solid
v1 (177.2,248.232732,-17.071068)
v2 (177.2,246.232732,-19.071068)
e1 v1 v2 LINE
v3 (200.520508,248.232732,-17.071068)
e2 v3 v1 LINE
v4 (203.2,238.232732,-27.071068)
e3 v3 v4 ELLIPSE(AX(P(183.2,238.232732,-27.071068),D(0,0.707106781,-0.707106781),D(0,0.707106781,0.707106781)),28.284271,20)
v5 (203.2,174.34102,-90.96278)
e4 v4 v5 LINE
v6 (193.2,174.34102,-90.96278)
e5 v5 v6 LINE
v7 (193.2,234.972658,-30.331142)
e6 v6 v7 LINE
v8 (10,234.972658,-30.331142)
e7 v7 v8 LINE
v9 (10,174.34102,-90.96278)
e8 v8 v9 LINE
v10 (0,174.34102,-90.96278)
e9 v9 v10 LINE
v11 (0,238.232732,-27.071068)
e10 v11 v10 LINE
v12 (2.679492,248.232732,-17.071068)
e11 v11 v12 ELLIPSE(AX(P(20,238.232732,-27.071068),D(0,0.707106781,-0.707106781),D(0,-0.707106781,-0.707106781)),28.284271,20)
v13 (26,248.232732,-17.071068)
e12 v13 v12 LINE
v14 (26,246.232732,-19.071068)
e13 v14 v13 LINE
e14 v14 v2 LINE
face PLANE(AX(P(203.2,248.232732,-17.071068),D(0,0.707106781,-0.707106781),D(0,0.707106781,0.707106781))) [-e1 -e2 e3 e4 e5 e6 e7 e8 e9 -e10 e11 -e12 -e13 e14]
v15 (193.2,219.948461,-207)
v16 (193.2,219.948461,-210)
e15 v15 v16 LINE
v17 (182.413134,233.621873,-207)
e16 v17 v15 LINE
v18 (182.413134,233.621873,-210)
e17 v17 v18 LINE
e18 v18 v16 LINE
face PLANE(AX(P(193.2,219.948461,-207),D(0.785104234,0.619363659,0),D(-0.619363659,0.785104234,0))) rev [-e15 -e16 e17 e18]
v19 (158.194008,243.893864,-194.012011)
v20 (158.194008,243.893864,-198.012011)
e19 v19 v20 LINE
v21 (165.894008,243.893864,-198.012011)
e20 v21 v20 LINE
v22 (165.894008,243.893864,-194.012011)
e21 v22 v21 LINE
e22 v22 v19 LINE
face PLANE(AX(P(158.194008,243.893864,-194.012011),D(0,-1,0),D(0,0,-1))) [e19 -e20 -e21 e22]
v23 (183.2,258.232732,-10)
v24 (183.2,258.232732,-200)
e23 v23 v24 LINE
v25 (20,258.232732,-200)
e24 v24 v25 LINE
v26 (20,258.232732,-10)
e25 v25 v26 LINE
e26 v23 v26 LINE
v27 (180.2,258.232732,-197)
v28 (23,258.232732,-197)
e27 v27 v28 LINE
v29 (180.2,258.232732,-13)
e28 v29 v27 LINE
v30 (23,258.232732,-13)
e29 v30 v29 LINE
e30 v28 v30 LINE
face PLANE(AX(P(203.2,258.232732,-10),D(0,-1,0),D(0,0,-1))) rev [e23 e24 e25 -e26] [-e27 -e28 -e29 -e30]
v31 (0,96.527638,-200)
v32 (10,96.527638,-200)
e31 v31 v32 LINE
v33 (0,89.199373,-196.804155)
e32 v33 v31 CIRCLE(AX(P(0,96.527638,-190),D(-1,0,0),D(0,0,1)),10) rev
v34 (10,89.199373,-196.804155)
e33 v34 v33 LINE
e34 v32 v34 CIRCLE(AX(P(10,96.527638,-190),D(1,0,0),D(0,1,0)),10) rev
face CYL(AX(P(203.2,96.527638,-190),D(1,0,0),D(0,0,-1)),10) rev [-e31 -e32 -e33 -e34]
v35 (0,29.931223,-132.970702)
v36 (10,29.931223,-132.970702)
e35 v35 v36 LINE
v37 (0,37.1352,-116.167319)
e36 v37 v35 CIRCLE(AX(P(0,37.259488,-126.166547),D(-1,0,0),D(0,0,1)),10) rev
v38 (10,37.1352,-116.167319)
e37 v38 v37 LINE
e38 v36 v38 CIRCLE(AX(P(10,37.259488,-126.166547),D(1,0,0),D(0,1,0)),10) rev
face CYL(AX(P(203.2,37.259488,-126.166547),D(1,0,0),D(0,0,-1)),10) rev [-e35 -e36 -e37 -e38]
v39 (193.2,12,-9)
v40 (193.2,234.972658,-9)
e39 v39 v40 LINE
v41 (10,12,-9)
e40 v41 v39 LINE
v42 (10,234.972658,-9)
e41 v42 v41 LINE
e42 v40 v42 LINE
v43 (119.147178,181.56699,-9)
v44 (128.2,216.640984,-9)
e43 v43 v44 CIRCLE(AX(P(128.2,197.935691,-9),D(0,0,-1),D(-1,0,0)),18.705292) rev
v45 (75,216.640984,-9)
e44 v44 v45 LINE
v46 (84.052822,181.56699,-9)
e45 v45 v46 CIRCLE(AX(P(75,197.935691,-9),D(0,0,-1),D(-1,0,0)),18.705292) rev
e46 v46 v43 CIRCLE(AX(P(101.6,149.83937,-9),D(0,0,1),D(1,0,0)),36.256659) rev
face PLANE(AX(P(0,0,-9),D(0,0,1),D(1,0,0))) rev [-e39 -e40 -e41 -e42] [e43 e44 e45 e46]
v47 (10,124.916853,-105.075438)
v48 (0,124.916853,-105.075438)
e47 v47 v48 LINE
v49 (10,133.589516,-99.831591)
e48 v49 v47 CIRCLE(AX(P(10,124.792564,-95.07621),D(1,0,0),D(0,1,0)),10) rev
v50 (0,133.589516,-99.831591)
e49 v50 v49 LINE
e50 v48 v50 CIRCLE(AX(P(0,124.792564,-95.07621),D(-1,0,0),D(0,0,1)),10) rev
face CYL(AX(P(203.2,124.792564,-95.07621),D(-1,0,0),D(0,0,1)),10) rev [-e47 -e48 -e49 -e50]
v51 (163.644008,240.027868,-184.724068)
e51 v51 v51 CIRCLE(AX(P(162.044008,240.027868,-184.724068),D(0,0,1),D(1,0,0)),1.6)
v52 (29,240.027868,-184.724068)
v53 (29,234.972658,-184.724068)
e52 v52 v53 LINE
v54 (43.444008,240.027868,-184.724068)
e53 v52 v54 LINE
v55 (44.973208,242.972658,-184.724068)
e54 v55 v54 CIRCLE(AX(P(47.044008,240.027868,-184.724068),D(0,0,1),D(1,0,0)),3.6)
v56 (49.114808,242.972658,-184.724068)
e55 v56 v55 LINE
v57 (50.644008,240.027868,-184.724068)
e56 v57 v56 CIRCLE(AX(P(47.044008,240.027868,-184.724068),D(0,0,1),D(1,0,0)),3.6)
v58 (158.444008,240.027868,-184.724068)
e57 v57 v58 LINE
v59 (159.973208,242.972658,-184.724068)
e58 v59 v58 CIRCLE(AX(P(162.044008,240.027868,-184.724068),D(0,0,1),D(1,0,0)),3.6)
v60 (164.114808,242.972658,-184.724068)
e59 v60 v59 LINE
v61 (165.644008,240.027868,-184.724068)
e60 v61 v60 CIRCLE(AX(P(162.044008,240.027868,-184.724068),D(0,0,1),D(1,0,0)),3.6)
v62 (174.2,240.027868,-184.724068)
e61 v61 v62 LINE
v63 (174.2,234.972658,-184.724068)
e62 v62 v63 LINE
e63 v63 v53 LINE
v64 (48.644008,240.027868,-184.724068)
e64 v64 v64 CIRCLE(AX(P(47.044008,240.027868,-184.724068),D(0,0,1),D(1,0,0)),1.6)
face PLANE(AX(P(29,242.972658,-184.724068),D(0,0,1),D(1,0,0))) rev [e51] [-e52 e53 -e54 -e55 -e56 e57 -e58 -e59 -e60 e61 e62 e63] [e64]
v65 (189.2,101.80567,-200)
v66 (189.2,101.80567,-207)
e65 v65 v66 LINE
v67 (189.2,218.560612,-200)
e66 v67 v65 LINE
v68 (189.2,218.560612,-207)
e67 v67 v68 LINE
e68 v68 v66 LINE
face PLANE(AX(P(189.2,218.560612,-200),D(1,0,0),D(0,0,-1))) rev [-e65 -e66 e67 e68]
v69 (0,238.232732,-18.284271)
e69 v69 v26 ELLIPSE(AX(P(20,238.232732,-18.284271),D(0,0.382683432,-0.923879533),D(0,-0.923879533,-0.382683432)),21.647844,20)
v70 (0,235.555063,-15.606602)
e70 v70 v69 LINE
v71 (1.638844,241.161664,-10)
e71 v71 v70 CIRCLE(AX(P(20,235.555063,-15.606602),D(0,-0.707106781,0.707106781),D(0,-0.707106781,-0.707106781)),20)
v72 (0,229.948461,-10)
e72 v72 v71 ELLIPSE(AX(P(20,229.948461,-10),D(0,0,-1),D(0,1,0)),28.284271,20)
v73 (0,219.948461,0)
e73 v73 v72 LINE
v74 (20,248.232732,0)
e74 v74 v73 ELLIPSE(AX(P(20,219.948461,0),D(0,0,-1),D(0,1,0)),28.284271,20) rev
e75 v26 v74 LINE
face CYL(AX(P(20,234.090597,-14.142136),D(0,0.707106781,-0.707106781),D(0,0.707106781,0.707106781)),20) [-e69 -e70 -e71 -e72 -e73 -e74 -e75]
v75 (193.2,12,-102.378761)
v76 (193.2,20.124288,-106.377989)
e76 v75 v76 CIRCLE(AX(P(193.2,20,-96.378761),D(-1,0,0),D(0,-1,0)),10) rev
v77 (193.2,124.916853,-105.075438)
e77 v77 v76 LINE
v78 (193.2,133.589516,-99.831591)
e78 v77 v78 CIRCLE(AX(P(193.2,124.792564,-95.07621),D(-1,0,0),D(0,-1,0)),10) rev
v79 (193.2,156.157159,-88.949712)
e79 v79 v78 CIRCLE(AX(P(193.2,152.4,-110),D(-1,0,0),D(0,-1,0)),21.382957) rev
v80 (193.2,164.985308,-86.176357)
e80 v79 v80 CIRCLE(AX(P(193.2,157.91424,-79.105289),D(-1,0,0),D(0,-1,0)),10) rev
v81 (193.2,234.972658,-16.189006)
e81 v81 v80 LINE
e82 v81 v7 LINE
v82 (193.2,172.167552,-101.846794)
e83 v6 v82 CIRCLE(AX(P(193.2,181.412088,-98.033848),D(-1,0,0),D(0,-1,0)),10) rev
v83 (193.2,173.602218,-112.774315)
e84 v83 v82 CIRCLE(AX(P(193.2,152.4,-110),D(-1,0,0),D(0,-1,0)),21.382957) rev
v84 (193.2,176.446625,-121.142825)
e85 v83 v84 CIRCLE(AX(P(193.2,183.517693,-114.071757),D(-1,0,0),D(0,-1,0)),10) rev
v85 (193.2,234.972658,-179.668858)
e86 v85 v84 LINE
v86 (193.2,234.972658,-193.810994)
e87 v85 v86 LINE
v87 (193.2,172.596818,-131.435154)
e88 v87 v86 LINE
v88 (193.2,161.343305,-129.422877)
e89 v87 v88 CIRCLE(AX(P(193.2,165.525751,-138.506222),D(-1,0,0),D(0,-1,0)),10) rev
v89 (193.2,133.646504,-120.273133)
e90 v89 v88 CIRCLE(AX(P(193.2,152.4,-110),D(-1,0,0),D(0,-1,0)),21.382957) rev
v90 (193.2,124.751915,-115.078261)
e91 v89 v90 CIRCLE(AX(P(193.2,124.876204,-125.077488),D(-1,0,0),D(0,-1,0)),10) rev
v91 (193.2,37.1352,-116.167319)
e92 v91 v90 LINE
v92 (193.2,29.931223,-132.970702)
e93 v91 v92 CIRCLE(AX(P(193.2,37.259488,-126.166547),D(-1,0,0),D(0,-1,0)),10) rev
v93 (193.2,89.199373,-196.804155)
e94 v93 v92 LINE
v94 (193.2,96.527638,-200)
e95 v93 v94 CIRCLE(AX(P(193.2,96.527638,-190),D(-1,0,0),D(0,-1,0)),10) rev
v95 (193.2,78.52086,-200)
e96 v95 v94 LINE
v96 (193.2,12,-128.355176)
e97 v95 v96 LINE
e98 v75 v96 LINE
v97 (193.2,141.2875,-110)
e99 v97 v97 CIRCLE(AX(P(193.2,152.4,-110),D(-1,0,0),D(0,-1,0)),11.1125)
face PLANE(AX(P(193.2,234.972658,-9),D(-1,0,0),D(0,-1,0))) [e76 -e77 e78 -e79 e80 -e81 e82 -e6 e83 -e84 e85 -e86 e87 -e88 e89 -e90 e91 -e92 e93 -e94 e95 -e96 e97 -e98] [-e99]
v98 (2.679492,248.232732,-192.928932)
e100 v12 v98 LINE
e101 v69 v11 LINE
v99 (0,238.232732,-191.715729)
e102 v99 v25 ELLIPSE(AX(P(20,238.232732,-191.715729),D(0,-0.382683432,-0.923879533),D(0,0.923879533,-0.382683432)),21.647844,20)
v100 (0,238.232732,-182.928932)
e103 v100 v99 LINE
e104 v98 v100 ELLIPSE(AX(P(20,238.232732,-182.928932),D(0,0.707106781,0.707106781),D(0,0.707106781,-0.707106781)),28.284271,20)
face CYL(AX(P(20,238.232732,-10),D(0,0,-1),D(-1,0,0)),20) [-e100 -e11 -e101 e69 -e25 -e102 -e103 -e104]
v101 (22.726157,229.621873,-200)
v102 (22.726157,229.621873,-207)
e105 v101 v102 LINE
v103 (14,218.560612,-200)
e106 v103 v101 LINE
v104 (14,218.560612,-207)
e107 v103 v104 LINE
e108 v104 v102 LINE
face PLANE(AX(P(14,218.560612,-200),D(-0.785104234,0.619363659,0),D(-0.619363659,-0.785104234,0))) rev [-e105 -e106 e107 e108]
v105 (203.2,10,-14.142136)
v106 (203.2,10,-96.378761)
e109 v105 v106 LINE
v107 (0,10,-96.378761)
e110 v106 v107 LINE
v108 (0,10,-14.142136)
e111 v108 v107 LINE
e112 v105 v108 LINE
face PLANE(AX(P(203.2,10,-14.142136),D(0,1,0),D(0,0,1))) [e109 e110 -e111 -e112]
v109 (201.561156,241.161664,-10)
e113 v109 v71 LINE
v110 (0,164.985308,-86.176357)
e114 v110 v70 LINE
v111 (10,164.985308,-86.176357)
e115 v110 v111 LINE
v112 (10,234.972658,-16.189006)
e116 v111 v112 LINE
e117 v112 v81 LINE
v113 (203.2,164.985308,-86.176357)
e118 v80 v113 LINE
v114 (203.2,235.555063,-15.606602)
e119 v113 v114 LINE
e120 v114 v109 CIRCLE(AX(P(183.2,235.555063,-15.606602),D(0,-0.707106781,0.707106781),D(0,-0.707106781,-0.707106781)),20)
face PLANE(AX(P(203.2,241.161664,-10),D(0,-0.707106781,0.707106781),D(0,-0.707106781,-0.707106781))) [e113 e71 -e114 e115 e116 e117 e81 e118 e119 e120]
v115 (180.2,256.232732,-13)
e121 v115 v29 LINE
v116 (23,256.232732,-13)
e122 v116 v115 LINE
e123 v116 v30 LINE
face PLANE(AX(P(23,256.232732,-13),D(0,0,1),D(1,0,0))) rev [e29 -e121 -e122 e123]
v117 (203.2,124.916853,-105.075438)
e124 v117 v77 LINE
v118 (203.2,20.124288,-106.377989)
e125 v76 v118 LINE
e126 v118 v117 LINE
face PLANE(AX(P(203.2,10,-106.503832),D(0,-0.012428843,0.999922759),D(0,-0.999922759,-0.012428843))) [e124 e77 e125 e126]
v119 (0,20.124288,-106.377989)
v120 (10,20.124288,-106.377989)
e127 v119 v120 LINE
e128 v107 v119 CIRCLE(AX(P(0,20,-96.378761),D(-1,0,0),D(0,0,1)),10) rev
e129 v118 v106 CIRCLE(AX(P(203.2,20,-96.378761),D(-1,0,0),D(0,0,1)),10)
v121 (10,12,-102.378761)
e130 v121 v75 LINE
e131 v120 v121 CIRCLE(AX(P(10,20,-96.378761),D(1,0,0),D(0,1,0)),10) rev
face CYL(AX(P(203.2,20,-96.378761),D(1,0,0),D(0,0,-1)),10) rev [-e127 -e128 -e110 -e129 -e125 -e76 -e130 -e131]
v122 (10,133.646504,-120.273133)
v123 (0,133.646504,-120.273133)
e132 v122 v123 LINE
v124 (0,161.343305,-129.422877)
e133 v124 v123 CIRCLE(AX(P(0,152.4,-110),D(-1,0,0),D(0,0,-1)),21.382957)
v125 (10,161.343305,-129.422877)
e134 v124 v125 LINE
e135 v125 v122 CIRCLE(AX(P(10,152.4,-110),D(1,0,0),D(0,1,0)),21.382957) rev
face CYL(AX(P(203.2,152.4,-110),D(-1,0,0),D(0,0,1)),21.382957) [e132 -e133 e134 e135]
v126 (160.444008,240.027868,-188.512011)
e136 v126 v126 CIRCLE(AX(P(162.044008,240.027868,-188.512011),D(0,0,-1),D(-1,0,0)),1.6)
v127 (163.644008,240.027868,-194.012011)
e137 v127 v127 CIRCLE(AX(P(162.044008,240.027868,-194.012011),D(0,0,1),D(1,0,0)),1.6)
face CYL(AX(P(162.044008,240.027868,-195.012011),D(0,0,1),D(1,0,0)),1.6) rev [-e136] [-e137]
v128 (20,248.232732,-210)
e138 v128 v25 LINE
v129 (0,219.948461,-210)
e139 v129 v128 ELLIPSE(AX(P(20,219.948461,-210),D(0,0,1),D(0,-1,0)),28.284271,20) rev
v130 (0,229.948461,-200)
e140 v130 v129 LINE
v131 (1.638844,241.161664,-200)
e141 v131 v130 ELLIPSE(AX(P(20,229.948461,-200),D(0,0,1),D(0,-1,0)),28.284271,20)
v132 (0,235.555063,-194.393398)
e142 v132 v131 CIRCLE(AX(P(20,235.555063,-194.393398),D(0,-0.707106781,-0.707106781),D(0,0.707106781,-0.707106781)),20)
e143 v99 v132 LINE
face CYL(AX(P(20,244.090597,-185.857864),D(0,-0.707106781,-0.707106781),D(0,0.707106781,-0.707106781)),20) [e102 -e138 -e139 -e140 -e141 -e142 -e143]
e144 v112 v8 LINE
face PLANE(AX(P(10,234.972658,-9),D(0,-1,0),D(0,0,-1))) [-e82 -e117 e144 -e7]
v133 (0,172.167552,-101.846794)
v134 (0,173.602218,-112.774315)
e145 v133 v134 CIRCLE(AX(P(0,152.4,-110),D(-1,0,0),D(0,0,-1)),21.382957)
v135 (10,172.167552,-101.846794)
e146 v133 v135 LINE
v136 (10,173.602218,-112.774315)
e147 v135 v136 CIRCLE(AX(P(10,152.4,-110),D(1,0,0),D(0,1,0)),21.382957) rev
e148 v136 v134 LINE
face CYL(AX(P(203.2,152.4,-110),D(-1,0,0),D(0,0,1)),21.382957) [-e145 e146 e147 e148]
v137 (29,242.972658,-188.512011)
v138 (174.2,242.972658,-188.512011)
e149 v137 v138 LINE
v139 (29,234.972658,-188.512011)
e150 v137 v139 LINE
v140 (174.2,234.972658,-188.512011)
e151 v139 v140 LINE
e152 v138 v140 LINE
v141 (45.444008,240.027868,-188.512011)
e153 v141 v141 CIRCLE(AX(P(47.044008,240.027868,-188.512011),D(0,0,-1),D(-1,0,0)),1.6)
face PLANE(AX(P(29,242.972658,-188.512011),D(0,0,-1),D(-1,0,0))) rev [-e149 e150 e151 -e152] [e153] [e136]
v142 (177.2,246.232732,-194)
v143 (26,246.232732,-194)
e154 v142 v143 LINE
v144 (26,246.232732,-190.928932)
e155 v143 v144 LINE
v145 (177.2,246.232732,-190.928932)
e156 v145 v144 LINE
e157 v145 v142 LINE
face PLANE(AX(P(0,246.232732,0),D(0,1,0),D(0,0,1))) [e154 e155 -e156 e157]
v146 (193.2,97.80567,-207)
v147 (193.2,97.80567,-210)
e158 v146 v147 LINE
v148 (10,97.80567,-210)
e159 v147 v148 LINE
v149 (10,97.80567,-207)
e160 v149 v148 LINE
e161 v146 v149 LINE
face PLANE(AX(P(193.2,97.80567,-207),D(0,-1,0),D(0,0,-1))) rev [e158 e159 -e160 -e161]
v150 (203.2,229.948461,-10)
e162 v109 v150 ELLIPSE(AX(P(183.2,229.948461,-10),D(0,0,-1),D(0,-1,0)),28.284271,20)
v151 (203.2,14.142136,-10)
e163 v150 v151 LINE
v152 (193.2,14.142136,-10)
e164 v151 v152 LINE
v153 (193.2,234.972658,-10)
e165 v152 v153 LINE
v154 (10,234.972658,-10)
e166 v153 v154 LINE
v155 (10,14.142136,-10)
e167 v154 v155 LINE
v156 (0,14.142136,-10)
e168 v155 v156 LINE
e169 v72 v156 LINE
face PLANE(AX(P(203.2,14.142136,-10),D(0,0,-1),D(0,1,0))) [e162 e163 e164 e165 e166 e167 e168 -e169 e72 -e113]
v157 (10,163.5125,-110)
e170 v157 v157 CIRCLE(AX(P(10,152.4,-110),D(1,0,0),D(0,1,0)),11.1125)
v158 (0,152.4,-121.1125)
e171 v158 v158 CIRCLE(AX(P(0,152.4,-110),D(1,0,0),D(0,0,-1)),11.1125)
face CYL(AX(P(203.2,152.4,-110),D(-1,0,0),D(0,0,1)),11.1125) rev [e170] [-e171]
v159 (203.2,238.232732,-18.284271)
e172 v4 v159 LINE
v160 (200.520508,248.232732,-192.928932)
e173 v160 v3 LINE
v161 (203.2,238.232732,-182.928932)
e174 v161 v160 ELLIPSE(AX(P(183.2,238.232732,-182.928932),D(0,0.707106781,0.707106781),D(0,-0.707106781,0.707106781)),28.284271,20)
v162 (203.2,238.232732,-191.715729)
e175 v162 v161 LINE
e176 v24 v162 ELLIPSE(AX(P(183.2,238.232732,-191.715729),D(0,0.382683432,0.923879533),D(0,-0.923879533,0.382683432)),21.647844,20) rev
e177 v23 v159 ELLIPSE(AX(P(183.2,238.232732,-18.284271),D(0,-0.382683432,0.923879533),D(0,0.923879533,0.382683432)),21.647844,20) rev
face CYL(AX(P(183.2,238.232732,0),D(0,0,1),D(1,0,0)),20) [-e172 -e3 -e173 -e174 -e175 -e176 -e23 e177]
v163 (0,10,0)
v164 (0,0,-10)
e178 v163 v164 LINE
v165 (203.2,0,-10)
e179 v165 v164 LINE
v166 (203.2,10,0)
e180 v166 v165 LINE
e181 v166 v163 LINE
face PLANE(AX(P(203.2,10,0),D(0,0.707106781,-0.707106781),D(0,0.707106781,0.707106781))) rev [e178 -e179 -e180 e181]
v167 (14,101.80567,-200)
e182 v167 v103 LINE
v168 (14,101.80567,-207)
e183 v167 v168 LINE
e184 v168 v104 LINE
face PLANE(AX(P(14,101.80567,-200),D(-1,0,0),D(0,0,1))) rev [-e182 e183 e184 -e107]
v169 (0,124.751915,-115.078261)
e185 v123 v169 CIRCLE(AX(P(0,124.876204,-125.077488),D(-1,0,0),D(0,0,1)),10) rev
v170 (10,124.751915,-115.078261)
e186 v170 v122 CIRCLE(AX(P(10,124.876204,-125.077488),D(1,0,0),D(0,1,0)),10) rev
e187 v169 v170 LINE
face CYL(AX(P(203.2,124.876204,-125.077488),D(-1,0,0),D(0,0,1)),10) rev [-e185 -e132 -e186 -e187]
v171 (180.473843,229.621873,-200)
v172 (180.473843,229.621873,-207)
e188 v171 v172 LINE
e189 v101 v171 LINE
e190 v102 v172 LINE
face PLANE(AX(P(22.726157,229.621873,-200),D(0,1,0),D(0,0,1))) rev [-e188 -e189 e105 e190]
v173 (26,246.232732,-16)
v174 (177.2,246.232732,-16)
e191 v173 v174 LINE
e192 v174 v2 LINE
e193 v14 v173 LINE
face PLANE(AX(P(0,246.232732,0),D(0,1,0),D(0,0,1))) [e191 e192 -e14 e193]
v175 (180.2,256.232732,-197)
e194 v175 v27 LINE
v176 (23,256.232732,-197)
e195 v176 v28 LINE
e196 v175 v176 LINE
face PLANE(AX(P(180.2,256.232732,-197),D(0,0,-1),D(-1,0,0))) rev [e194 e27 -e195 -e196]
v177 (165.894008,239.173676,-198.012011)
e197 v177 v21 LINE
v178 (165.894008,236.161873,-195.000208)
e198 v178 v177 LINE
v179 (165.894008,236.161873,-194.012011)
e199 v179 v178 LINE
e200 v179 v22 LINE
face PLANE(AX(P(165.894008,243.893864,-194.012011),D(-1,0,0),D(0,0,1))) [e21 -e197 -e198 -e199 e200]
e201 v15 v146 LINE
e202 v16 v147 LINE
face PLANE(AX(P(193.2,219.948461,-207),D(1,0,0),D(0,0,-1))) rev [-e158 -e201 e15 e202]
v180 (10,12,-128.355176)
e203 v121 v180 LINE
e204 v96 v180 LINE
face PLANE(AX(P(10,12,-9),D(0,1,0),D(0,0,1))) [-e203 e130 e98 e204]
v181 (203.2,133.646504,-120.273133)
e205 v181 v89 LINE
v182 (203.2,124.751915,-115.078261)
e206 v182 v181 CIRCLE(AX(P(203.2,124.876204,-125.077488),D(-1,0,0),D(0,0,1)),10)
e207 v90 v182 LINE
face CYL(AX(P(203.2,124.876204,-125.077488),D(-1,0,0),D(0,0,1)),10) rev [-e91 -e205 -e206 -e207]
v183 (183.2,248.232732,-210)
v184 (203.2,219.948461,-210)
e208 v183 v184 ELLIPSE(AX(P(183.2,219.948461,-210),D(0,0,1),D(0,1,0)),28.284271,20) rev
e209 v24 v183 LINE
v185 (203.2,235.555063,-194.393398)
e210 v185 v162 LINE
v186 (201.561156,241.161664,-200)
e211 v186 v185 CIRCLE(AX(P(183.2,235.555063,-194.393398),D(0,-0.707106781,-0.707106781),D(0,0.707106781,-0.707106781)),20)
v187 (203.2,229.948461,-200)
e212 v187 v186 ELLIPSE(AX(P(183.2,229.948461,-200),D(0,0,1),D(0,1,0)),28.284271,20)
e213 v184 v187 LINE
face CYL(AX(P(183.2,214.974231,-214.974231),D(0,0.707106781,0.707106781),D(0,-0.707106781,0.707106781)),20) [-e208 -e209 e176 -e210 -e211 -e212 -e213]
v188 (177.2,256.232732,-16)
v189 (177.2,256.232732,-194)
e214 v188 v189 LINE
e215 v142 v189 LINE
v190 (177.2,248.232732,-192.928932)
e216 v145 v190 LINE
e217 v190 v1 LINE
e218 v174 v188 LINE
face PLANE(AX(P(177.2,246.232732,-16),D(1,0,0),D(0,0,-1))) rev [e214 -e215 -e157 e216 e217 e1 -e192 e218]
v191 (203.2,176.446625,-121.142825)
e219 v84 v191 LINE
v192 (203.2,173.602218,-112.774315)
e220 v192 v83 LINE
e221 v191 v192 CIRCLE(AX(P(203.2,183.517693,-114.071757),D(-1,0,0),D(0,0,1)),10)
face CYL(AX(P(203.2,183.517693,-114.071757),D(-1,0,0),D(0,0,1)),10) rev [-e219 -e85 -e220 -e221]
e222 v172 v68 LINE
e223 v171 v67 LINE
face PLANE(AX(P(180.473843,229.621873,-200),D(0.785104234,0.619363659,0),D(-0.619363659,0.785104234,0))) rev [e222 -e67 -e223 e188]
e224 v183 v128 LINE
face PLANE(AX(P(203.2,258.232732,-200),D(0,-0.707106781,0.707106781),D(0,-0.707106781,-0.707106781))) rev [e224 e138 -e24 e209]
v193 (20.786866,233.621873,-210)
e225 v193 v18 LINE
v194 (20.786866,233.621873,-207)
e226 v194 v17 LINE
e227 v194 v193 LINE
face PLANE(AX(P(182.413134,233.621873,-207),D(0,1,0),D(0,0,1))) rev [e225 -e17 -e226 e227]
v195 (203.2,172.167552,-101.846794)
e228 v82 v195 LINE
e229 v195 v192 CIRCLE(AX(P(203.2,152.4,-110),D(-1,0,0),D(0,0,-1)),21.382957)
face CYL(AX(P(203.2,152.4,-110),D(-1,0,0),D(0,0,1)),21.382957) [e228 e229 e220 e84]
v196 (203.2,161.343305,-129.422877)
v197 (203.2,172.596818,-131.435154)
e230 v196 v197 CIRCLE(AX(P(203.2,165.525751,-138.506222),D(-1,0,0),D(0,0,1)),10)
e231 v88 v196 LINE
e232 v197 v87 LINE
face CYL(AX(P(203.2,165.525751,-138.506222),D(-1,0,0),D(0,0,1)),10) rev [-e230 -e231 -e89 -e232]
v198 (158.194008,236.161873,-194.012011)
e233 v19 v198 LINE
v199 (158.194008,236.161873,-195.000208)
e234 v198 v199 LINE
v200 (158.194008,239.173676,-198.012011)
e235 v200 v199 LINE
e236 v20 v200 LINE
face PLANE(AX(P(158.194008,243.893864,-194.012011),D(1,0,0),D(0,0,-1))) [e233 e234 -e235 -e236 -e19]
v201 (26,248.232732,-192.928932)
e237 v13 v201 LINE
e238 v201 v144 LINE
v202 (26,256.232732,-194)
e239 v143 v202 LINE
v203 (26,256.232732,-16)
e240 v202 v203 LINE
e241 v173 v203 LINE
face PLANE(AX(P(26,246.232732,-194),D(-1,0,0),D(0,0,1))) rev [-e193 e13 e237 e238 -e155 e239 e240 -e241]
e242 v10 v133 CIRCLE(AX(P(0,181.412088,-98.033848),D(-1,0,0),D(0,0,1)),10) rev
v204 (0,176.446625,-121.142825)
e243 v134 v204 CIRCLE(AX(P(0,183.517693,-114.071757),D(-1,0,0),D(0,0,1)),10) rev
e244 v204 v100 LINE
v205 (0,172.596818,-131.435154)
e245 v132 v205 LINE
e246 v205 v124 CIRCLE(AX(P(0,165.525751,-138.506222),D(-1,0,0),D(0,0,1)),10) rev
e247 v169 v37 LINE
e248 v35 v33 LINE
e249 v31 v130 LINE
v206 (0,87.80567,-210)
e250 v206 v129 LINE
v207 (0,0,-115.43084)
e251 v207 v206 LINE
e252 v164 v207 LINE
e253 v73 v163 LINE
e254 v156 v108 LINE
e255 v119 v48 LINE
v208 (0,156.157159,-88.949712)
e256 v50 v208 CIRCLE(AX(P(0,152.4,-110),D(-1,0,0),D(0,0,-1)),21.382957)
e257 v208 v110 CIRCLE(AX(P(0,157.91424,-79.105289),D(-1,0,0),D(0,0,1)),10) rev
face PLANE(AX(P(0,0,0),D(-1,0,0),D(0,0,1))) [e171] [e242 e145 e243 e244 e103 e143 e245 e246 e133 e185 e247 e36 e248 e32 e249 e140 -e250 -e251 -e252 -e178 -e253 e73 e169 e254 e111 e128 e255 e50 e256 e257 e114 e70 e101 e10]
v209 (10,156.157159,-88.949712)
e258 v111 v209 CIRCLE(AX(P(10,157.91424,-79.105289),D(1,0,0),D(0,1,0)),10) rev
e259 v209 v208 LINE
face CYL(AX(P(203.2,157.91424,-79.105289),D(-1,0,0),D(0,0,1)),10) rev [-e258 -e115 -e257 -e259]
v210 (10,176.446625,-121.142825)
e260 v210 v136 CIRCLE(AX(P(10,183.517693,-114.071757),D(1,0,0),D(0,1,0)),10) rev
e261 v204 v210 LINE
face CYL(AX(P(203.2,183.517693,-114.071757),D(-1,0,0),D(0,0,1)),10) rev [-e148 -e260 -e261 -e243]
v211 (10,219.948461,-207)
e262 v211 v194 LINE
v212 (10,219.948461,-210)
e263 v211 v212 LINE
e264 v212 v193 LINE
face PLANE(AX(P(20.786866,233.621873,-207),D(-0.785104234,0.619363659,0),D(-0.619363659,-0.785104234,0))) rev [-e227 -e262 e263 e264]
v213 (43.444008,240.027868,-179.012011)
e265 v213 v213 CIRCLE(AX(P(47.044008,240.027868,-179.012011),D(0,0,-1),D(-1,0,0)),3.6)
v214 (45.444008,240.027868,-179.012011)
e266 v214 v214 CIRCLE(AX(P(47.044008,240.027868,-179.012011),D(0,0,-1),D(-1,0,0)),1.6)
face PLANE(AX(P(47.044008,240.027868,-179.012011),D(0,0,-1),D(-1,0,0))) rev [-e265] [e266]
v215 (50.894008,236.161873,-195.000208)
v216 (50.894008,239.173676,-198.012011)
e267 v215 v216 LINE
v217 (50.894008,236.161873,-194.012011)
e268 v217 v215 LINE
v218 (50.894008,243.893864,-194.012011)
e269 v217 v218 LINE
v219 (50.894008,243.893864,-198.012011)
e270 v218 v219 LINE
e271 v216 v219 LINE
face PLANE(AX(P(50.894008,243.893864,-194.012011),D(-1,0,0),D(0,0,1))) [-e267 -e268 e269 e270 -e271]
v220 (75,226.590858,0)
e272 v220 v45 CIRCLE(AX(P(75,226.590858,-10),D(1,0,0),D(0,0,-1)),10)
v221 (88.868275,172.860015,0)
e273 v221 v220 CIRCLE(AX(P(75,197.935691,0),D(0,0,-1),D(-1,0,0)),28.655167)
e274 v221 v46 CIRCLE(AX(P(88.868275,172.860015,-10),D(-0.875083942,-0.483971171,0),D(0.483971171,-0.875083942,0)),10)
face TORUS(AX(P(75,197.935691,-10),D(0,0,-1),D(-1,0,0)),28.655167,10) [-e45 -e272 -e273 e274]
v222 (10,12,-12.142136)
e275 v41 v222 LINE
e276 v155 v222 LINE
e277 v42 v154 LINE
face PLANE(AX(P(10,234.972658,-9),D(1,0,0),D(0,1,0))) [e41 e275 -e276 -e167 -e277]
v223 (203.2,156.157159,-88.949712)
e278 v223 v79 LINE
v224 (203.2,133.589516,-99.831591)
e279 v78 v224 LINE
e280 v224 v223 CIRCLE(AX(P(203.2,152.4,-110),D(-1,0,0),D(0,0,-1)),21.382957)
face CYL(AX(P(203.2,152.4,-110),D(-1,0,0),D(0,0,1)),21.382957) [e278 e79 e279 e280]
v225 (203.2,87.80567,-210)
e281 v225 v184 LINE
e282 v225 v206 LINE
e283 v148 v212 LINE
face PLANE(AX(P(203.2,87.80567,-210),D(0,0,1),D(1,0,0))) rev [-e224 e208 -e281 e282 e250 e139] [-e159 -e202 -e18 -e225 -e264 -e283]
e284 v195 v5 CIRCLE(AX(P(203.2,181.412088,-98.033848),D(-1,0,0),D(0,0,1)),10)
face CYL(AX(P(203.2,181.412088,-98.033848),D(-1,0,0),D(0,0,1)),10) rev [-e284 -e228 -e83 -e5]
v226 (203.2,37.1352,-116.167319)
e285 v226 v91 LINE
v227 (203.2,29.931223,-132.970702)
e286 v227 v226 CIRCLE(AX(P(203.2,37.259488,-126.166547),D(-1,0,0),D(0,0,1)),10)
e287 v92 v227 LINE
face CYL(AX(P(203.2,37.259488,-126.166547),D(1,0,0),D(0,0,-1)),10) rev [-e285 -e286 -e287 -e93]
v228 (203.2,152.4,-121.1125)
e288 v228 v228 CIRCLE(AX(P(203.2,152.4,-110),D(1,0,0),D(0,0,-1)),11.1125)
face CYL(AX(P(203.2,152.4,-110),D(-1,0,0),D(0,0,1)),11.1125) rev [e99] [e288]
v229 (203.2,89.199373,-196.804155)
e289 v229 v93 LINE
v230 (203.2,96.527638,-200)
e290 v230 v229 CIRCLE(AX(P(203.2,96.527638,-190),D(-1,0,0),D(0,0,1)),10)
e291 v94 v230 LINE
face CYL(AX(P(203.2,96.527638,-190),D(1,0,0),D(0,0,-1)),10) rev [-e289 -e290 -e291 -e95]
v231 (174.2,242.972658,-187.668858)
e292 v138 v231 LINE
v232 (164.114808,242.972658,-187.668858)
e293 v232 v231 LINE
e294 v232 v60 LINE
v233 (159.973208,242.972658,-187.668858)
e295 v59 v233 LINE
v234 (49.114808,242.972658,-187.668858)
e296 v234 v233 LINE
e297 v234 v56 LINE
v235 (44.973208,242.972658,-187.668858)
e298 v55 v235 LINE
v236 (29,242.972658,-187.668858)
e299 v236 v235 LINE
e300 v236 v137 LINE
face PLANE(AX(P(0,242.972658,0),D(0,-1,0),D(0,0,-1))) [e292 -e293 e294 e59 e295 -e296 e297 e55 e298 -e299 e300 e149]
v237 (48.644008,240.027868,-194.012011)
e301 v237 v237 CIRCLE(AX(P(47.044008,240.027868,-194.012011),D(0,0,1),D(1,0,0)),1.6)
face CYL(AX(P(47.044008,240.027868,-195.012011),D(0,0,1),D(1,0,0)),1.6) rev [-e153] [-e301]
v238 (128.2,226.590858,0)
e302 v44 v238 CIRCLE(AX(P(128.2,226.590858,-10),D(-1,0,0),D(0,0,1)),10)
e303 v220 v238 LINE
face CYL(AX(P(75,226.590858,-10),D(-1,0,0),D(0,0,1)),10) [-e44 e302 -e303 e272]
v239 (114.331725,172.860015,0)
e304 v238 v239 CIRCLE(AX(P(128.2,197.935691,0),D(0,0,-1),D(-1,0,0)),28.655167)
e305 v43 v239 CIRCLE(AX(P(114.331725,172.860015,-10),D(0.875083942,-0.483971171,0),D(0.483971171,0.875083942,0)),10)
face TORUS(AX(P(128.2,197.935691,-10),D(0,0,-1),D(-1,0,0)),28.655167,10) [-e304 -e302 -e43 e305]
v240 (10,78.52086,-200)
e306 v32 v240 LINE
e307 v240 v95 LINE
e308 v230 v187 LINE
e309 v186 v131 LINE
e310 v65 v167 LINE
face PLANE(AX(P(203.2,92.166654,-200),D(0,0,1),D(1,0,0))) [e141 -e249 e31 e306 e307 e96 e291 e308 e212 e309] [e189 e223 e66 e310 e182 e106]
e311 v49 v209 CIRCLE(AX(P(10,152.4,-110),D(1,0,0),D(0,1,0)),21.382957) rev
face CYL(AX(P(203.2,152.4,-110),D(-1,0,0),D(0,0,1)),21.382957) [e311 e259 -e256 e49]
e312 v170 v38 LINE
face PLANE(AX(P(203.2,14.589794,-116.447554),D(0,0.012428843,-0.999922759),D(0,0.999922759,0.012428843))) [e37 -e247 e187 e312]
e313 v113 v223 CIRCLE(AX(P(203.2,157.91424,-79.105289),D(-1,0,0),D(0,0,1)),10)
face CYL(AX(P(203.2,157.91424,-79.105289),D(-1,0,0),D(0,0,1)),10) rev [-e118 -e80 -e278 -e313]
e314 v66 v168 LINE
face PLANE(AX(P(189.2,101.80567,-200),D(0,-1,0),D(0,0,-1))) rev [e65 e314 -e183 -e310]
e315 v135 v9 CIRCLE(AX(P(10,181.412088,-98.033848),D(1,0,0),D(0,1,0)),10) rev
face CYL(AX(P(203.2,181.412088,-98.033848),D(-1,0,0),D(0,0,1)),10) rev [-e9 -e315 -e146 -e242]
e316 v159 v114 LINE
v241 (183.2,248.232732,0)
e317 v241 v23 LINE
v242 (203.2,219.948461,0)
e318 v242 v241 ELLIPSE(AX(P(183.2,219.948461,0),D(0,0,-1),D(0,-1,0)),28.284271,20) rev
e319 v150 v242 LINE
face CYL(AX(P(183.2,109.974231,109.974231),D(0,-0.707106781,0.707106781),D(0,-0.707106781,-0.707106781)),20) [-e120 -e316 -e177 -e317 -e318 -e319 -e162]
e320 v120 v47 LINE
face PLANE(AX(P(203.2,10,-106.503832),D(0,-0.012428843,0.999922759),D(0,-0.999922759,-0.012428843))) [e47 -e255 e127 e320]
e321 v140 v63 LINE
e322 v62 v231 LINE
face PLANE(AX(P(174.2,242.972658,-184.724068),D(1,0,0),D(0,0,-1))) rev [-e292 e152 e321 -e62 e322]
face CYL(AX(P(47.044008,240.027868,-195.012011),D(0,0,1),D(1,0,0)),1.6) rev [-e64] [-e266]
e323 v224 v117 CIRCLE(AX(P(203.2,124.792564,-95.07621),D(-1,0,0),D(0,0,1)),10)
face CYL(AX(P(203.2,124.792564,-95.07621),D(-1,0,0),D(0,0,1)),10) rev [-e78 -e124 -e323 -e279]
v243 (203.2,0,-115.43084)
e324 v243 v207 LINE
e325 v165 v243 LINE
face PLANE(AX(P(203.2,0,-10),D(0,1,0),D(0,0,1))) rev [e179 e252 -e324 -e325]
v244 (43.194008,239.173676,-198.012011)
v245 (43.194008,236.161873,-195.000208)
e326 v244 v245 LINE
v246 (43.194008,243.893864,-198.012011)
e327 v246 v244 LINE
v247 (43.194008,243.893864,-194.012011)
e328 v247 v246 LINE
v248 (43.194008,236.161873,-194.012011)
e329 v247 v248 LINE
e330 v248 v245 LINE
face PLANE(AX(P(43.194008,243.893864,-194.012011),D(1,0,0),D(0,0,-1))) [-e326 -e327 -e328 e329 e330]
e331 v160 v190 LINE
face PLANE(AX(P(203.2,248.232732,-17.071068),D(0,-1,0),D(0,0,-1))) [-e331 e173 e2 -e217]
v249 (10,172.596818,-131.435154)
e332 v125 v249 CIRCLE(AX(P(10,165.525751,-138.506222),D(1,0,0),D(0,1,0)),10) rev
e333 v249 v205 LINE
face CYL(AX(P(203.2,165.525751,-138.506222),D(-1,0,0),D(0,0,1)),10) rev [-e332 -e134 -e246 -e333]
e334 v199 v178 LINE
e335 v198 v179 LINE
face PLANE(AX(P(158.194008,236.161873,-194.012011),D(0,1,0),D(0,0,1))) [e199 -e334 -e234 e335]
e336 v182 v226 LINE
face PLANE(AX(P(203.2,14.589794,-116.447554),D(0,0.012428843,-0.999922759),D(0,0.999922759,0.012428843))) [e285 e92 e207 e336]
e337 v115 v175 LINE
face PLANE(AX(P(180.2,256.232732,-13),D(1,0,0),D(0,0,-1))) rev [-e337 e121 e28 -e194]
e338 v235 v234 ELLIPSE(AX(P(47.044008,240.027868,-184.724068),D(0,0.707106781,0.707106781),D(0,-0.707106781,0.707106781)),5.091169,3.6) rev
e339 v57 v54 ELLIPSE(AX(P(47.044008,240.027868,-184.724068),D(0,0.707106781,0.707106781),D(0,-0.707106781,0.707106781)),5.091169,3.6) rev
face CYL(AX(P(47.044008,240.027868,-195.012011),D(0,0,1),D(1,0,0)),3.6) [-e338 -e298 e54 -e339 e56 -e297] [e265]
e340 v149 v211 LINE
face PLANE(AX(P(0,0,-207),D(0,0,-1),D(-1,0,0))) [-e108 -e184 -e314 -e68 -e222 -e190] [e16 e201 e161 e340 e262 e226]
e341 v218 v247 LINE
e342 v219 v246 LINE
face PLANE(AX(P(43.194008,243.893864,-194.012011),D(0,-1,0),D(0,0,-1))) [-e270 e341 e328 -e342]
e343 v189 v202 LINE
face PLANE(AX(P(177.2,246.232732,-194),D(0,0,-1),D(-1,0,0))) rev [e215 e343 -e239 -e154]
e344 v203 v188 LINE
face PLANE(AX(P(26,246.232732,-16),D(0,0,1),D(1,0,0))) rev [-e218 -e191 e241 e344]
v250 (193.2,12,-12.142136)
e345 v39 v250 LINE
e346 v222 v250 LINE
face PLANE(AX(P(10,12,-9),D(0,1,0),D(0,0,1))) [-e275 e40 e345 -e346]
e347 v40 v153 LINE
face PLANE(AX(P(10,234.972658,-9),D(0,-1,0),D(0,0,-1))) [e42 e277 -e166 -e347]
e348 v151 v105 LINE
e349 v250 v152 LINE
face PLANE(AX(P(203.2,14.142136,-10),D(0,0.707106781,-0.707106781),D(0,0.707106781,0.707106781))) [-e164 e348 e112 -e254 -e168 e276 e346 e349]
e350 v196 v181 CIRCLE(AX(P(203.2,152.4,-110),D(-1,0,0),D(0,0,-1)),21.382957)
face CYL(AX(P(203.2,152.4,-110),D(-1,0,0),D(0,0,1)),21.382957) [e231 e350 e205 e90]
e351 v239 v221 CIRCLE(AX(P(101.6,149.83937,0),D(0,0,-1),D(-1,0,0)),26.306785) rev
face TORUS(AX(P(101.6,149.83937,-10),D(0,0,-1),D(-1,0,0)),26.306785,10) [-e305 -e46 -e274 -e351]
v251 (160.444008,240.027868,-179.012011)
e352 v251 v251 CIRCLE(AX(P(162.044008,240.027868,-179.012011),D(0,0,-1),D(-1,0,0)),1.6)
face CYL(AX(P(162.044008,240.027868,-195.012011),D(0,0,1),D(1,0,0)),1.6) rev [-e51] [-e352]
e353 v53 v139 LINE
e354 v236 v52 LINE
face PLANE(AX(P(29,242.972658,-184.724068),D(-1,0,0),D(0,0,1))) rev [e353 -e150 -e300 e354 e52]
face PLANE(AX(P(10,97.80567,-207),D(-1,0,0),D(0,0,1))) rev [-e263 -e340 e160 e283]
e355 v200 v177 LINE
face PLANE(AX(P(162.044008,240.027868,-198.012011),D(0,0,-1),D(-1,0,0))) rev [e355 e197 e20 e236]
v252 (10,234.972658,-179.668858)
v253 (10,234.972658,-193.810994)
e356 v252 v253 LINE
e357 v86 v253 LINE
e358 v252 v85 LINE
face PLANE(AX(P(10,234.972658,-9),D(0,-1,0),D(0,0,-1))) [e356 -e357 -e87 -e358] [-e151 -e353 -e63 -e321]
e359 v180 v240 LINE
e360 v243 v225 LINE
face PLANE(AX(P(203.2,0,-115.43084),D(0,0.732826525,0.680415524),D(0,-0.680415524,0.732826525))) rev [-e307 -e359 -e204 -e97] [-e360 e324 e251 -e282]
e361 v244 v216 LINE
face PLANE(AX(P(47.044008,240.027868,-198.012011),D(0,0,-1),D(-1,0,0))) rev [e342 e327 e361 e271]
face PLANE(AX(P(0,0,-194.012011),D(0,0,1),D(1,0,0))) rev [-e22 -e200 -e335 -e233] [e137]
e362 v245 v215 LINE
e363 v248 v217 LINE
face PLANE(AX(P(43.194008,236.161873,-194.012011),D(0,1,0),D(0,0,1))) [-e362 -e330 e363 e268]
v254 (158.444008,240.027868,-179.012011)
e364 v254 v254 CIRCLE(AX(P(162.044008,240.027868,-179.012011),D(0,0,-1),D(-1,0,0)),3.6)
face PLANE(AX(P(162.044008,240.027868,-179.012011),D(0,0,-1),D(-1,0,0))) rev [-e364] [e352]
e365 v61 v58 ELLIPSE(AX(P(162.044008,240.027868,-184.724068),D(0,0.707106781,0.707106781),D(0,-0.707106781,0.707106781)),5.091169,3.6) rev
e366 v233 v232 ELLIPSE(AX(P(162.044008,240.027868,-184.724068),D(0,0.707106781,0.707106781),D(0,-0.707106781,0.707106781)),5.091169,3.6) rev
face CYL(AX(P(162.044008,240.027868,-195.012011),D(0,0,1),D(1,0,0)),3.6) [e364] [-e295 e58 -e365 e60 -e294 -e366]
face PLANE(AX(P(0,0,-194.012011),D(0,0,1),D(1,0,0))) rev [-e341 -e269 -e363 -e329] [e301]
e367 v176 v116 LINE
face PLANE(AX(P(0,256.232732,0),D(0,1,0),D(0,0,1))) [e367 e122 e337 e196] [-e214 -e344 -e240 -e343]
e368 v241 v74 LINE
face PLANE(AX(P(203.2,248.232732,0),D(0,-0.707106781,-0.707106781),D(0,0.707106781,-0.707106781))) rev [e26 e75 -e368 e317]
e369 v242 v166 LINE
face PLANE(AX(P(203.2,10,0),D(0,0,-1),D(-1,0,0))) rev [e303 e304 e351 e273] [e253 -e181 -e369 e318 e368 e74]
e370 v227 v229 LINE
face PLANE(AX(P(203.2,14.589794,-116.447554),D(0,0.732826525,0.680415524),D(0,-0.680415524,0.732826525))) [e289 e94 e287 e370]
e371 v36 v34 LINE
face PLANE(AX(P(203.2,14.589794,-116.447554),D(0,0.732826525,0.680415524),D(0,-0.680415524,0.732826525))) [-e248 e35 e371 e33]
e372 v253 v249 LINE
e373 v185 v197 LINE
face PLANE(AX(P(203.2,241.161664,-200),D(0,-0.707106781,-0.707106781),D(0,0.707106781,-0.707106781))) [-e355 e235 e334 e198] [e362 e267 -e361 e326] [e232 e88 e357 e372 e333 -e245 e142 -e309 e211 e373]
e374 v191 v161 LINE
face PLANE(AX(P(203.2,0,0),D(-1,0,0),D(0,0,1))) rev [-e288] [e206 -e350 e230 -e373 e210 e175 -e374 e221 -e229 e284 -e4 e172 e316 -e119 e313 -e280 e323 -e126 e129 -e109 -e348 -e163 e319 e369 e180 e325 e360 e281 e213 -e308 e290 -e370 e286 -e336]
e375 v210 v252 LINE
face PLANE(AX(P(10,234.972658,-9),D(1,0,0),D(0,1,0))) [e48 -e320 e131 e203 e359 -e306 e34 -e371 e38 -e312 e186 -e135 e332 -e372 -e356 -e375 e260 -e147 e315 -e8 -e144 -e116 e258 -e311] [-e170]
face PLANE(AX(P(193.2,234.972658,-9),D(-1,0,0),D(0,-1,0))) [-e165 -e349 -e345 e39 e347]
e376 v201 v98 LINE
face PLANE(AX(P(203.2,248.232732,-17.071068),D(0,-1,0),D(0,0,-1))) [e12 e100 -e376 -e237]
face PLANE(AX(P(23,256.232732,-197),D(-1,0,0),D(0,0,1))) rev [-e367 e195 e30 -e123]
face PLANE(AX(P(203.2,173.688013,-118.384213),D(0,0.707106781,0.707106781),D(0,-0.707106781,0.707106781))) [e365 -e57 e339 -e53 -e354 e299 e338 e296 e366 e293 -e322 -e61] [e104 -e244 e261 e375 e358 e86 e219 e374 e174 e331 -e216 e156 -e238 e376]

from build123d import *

# Parameters (mm, degrees)
PROFILE_R                 = 11.1125
BOSS_EXTRUDE1_DEPTH       = 203.2
CUT_EXTRUDE_EYEPORT_DEPTH = 10
FILLET1_R                 = 20
FILLET2_R                 = 10
FILLET3_R                 = 10
INTERIOR_W                = 183.2
INTERIOR_H                = 222.972657995
CUT_EXTRUDE2_DEPTH        = 191
DISPLAYMOUNT_R            = 3.6
DISPLAYMOUNT_R_2          = 1.6
BOSS_EXTRUDE2_DEPTH       = 16
SKETCH10_R                = 1.6
CUT_EXTRUDE3_DEPTH        = 19
SKETCH11_W                = 145.2
SKETCH11_H                = 3.787943236
CUT_EXTRUDE4_DEPTH        = 8
BOLTHOLE_W                = 7.7
BOLTHOLE_H                = 7.731991347
CUT_EXTRUDE5_DEPTH        = 4
CUT_EXTRUDE6_DEPTH        = 3
CUT_EXTRUDE7_DEPTH        = 7
SKETCH19_W                = 157.2
SKETCH19_H                = 184
CUT_EXTRUDE10_DEPTH       = 2
SKETCH20_W                = 151.2
SKETCH20_H                = 178
CUT_EXTRUDE11_DEPTH       = 10
FILLET4_R                 = 10


# Some blends are built 0.0001 mm under size
with BuildPart() as part:
    # Profile → Boss-Extrude1 (new body)
    with BuildSketch(Plane(origin=(0, 0, 0), x_dir=(0, 0, -1), z_dir=(1, 0, 0))):
        Polygon((0, 248.232732248), (10, 258.232732248), (200, 258.232732248), (210, 248.232732248), (210, 87.805670423), (115.430840334, 0), (10, 0), (0, 10), align=None)
        with Locations((110, 152.4)):
            Circle(PROFILE_R, mode=Mode.SUBTRACT)
        with BuildLine():
            Line((17.071067812, 248.232732248), (192.928932188, 248.232732248))
            Line((192.928932188, 248.232732248), (118.384212734, 173.688012794))
            Line((118.384212734, 173.688012794), (117.222470863, 172.526270923))
            ThreePointArc((117.222470863, 172.526270923), (106.333066326, 173.466192444), (96.401736588, 168.902063472))
            Line((96.401736588, 168.902063472), (17.071067812, 248.232732248))
        make_face(mode=Mode.SUBTRACT)
        with BuildLine():
            Line((200, 92.166654443), (200, 241.161664436))
            Line((200, 241.161664436), (125.726519124, 166.888183561))
            ThreePointArc((125.726519124, 166.888183561), (130.458133202, 146.179417026), (114.999613795, 131.609744385))
            Line((114.999613795, 131.609744385), (114.999613795, 131.079186829))
            Line((114.999613795, 131.079186829), (116.447554057, 14.589793684))
            Line((116.447554057, 14.589793684), (200, 92.166654443))
        make_face(mode=Mode.SUBTRACT)
        with BuildLine():
            Line((14.142135624, 10), (106.503831821, 10))
            Line((106.503831821, 10), (105.000386205, 130.954898395))
            Line((105.000386205, 130.954898395), (105.000386205, 131.609744385))
            ThreePointArc((105.000386205, 131.609744385), (90.888278858, 142.809745486), (90.343724725, 160.817939711))
            Line((90.343724725, 160.817939711), (89.405055003, 161.756609433))
            Line((89.405055003, 161.756609433), (10, 241.161664436))
            Line((10, 241.161664436), (10, 14.142135624))
            Line((10, 14.142135624), (14.142135624, 10))
        make_face(mode=Mode.SUBTRACT)
    extrude(amount=BOSS_EXTRUDE1_DEPTH)

    # Eyeport → Cut-Extrude - Eyeport (cut)
    with BuildSketch(Plane.XY):
        with BuildLine():
            Line((75, 216.590857994), (128.2, 216.590857994))
            ThreePointArc((128.2, 216.590857994), (146.26319193, 193.273465676), (119.171437061, 181.610854249))
            ThreePointArc((119.171437061, 181.610854249), (101.6, 186.146154662), (84.028562939, 181.610854249))
            ThreePointArc((84.028562939, 181.610854249), (56.93680807, 193.273465676), (75, 216.590857994))
        make_face()
    extrude(amount=-CUT_EXTRUDE_EYEPORT_DEPTH, mode=Mode.SUBTRACT)

    # Fillet1
    # the kernel refuses this fillet: 20 mm, written as the material it takes off along each edge
    with BuildSketch(Plane(origin=(203.2, 293.588071308, -164.644660941), x_dir=(0, -0.7071067811865486, 0.7071067811865466), z_dir=(0, -0.7071067811865466, -0.7071067811865486)), Plane(origin=(0, 212.877393189, 35.355339059), x_dir=(1, 0, 0), z_dir=(0, 0.7071067811865476, -0.7071067811865476))) as fillet1_piece_1:
        with BuildLine():
            CenterArc((FILLET1_R, FILLET1_R), FILLET1_R, 180, 90)
            Line((0, FILLET1_R), (0, 0))
            Line((0, 0), (FILLET1_R, 0))
        make_face()
    extrude(amount=114.142135624, mode=Mode.SUBTRACT)
    with BuildSketch(Plane(origin=(0, 293.588071308, -164.644660941), x_dir=(0, -0.7071067811865486, 0.7071067811865466), z_dir=(0, -0.7071067811865466, -0.7071067811865486)), Plane(origin=(203.2, 212.877393189, 35.355339059), x_dir=(-1, 0, 0), z_dir=(0, 0.7071067811865476, -0.7071067811865476))) as fillet1_piece_2:
        with BuildLine():
            CenterArc((FILLET1_R, -FILLET1_R), FILLET1_R, 90, 90)
            Line((0, -FILLET1_R), (0, 0))
            Line((0, 0), (FILLET1_R, 0))
        make_face()
    extrude(amount=114.142135624, mode=Mode.SUBTRACT)
    with BuildSketch(Plane(origin=(203.2, 258.232732248, 40), x_dir=(-1, 0, 0), z_dir=(0, 0, -1))) as fillet1_piece_3:
        with BuildLine():
            CenterArc((FILLET1_R, -FILLET1_R), FILLET1_R, 90, 90)
            Line((0, -FILLET1_R), (0, 0))
            Line((0, 0), (FILLET1_R, 0))
        make_face()
    extrude(amount=290, mode=Mode.SUBTRACT)
    with BuildSketch(Plane(origin=(0, 258.232732248, 40), x_dir=(1, 0, 0), z_dir=(0, 0, -1))) as fillet1_piece_4:
        with BuildLine():
            CenterArc((FILLET1_R, FILLET1_R), FILLET1_R, 180, 90)
            Line((0, FILLET1_R), (0, 0))
            Line((0, 0), (FILLET1_R, 0))
        make_face()
    extrude(amount=290, mode=Mode.SUBTRACT)

    # Fillet2
    fillet2_edges = [part.edges().sort_by_distance(p)[0] for p in [
        (101.6, 131.609744385, -105.000386205),
        (101.6, 131.609744385, -114.999613795),
        (101.6, 166.888183561, -125.726519124),
        (101.6, 160.817939711, -90.343724725),
        (101.6, 168.902063472, -96.401736588),
        (101.6, 172.526270923, -117.222470863),
    ]]
    fillet(fillet2_edges, radius=FILLET2_R)

    # Fillet3
    fillet3_edges = [part.edges().sort_by_distance(p)[0] for p in [
        (101.6, 216.590857994, 0),
        (146.26319193, 193.273465676, 0),
        (101.6, 186.146154662, 0),
        (56.93680807, 193.273465676, 0),
    ]]
    fillet(fillet3_edges, radius=FILLET3_R - 0.0001)  # a hair under: the kernel refuses the full size

    # Interior → Cut-Extrude2 (cut)
    with BuildSketch(Plane.XY.offset(-200)):
        with Locations((101.6, 123.486328998)):
            Rectangle(INTERIOR_W, INTERIOR_H)
    extrude(amount=CUT_EXTRUDE2_DEPTH, mode=Mode.SUBTRACT)

    # DisplayMount → Boss-Extrude2 (add)
    # profile 1 of 2: a face of its own
    with BuildSketch(Plane(origin=(0, 0, -179.012011391), x_dir=(-1, 0, 0), z_dir=(0, 0, -1))):
        with Locations(Location((-162.04400772, 240.027868216, 0), (0, 0, 270))):
            Circle(DISPLAYMOUNT_R)
        with Locations(Location((-162.04400772, 240.027868216, 0), (0, 0, 270))):
            Circle(DISPLAYMOUNT_R_2, mode=Mode.SUBTRACT)
    # profile 2 of 2: a face of its own
    with BuildSketch(Plane(origin=(0, 0, -179.012011391), x_dir=(-1, 0, 0), z_dir=(0, 0, -1))):
        with Locations(Location((-47.04400772, 240.027868216, 0), (0, 0, 270))):
            Circle(DISPLAYMOUNT_R)
        with Locations(Location((-47.04400772, 240.027868216, 0), (0, 0, 270))):
            Circle(DISPLAYMOUNT_R_2, mode=Mode.SUBTRACT)
    extrude(amount=BOSS_EXTRUDE2_DEPTH)

    # Sketch10 → Cut-Extrude3 (cut)
    with BuildSketch(Plane(origin=(0, 0, -179.012011391), x_dir=(-1, 0, 0), z_dir=(0, 0, -1))):
        with Locations(Location((-162.04400772, 240.027868216, 0), (0, 0, 212.267326462))):
            Circle(SKETCH10_R)
        with Locations(Location((-47.04400772, 240.027868216, 0), (0, 0, 212.267326462))):
            Circle(SKETCH10_R)
    extrude(amount=CUT_EXTRUDE3_DEPTH, mode=Mode.SUBTRACT)

    # Sketch11 → Cut-Extrude4 (cut)
    with BuildSketch(Plane.XZ.offset(-234.972657995)):
        with Locations((101.6, -186.618039773)):
            Rectangle(SKETCH11_W, SKETCH11_H)
    extrude(amount=-CUT_EXTRUDE4_DEPTH, mode=Mode.SUBTRACT)

    # Bolthole → Cut-Extrude5 (cut)
    with BuildSketch(Plane.XY.offset(-198.012011391)):
        with Locations((47.04400772, 240.027868216)):
            Rectangle(BOLTHOLE_W, BOLTHOLE_H)
        with Locations((162.04400772, 240.027868216)):
            Rectangle(BOLTHOLE_W, BOLTHOLE_H)
    extrude(amount=CUT_EXTRUDE5_DEPTH, mode=Mode.SUBTRACT)

    # Sketch14 → Cut-Extrude6 (cut)
    with BuildSketch(Plane(origin=(0, 0, -210), x_dir=(-1, 0, 0), z_dir=(0, 0, -1))):
        Polygon((-193.2, 219.948461001), (-182.413133958, 233.621872542), (-20.786866042, 233.621872542), (-10, 219.948461001), (-10, 97.805670423), (-193.2, 97.805670423), align=None)
    extrude(amount=-CUT_EXTRUDE6_DEPTH, mode=Mode.SUBTRACT)

    # Sketch16 → Cut-Extrude7 (cut)
    with BuildSketch(Plane(origin=(0, 0, -207), x_dir=(-1, 0, 0), z_dir=(0, 0, -1))):
        Polygon((-189.2, 218.560612276), (-189.2, 101.805670423), (-14, 101.805670423), (-14, 218.560612276), (-22.726156775, 229.621872542), (-180.473843225, 229.621872542), align=None)
    extrude(amount=-CUT_EXTRUDE7_DEPTH, mode=Mode.SUBTRACT)

    # Sketch19 → Cut-Extrude10 (cut)
    with BuildSketch(Plane(origin=(0, 258.232732248, 0), x_dir=(1, 0, 0), z_dir=(0, 1, 0))):
        with Locations((101.6, 105)):
            Rectangle(SKETCH19_W, SKETCH19_H)
    extrude(amount=-CUT_EXTRUDE10_DEPTH, mode=Mode.SUBTRACT)

    # Sketch20 → Cut-Extrude11 (cut)
    with BuildSketch(Plane(origin=(0, 256.232732248, 0), x_dir=(1, 0, 0), z_dir=(0, 1, 0))):
        with Locations((101.6, 105)):
            Rectangle(SKETCH20_W, SKETCH20_H)
    extrude(amount=-CUT_EXTRUDE11_DEPTH, mode=Mode.SUBTRACT)

    # Fillet4
    # the kernel refuses this fillet: 10 mm, written as the material it adds along each edge
    with BuildSketch(Plane(origin=(0, 10, -106.503831821), x_dir=(0, 0, 1), z_dir=(1, 0, 0))) as fillet4_piece_1_section:
        with BuildLine():
            CenterArc((FILLET4_R * 1.01250705049, -FILLET4_R), FILLET4_R, 90, 90.712138605)
            Line((FILLET4_R * 0.0125842915471, -FILLET4_R * 1.01242884338), (0, 0))
            Line((0, 0), (FILLET4_R * 1.01250705049, 0))
        make_face()
    fillet4_piece_1 = extrude(amount=203.2, mode=Mode.PRIVATE)
    fillet4_piece_1 = split(fillet4_piece_1, bisect_by=Plane(origin=(10, 10.734381859, -103.154099075), z_dir=(-1, 0, 0)), keep=Keep.TOP, mode=Mode.PRIVATE)
    fillet4_piece_1 = split(fillet4_piece_1, bisect_by=Plane(origin=(5, 12, -103.154099075), z_dir=(0, -1, 0)), keep=Keep.TOP, mode=Mode.PRIVATE)
    add(fillet4_piece_1)
    with BuildSketch(Plane(origin=(0, 10, -106.503831821), x_dir=(0, 0, 1), z_dir=(1, 0, 0))) as fillet4_piece_2_section:
        with BuildLine():
            CenterArc((FILLET4_R * 1.01250705049, -FILLET4_R), FILLET4_R, 90, 90.712138605)
            Line((FILLET4_R * 0.0125842915471, -FILLET4_R * 1.01242884338), (0, 0))
            Line((0, 0), (FILLET4_R * 1.01250705049, 0))
        make_face()
    fillet4_piece_2 = extrude(amount=203.2, mode=Mode.PRIVATE)
    fillet4_piece_2 = split(fillet4_piece_2, bisect_by=Plane(origin=(10, 14.237899365, -105.456108312), z_dir=(-1, 0, 0)), keep=Keep.TOP, mode=Mode.PRIVATE)
    fillet4_piece_2 = split(fillet4_piece_2, bisect_by=Plane(origin=(5, 12, -105.456108312), z_dir=(0, 1, 0)), keep=Keep.TOP, mode=Mode.PRIVATE)
    add(fillet4_piece_2)
    with BuildSketch(Plane(origin=(0, 10, -106.503831821), x_dir=(0, 0, 1), z_dir=(1, 0, 0))) as fillet4_piece_3_section:
        with BuildLine():
            CenterArc((FILLET4_R * 1.01250705049, -FILLET4_R), FILLET4_R, 90, 90.712138605)
            Line((FILLET4_R * 0.0125842915471, -FILLET4_R * 1.01242884338), (0, 0))
            Line((0, 0), (FILLET4_R * 1.01250705049, 0))
        make_face()
    fillet4_piece_3 = extrude(amount=203.2, mode=Mode.PRIVATE)
    fillet4_piece_3 = split(fillet4_piece_3, bisect_by=Plane(origin=(10, 10.734381859, -103.154099075), z_dir=(1, 0, 0)), keep=Keep.TOP, mode=Mode.PRIVATE)
    fillet4_piece_3 = split(fillet4_piece_3, bisect_by=Plane(origin=(101.6, 12, -103.154099075), z_dir=(0, -1, 0)), keep=Keep.TOP, mode=Mode.PRIVATE)
    fillet4_piece_3 = split(fillet4_piece_3, bisect_by=Plane(origin=(193.2, 10.734381859, -103.154099075), z_dir=(-1, 0, 0)), keep=Keep.TOP, mode=Mode.PRIVATE)
    add(fillet4_piece_3)
    with BuildSketch(Plane(origin=(0, 10, -106.503831821), x_dir=(0, 0, 1), z_dir=(1, 0, 0))) as fillet4_piece_4_section:
        with BuildLine():
            CenterArc((FILLET4_R * 1.01250705049, -FILLET4_R), FILLET4_R, 90, 90.712138605)
            Line((FILLET4_R * 0.0125842915471, -FILLET4_R * 1.01242884338), (0, 0))
            Line((0, 0), (FILLET4_R * 1.01250705049, 0))
        make_face()
    fillet4_piece_4 = extrude(amount=203.2, mode=Mode.PRIVATE)
    fillet4_piece_4 = split(fillet4_piece_4, bisect_by=Plane(origin=(198.2, 12, -103.154099075), z_dir=(0, -1, 0)), keep=Keep.TOP, mode=Mode.PRIVATE)
    fillet4_piece_4 = split(fillet4_piece_4, bisect_by=Plane(origin=(193.2, 10.734381859, -103.154099075), z_dir=(1, 0, 0)), keep=Keep.TOP, mode=Mode.PRIVATE)
    add(fillet4_piece_4)
    with BuildSketch(Plane(origin=(0, 10, -106.503831821), x_dir=(0, 0, 1), z_dir=(1, 0, 0))) as fillet4_piece_5_section:
        with BuildLine():
            CenterArc((FILLET4_R * 1.01250705049, -FILLET4_R), FILLET4_R, 90, 90.712138605)
            Line((FILLET4_R * 0.0125842915471, -FILLET4_R * 1.01242884338), (0, 0))
            Line((0, 0), (FILLET4_R * 1.01250705049, 0))
        make_face()
    fillet4_piece_5 = extrude(amount=203.2, mode=Mode.PRIVATE)
    fillet4_piece_5 = split(fillet4_piece_5, bisect_by=Plane(origin=(198.2, 12, -105.456108312), z_dir=(0, 1, 0)), keep=Keep.TOP, mode=Mode.PRIVATE)
    fillet4_piece_5 = split(fillet4_piece_5, bisect_by=Plane(origin=(193.2, 14.237899365, -105.456108312), z_dir=(1, 0, 0)), keep=Keep.TOP, mode=Mode.PRIVATE)
    add(fillet4_piece_5)
    with BuildSketch(Plane(origin=(0, 14.589793684, -116.447554057), x_dir=(0, 0.9999227589430834, 0.012428843375487733), z_dir=(1, 0, 0)), Plane(origin=(193.2, 14.589793684, -116.447554057), x_dir=(0, 0.9999227589430834, 0.012428843375487733), z_dir=(1, 0, 0))) as fillet4_piece_6:
        with BuildLine():
            CenterArc((FILLET4_R * 2.25471476598, -FILLET4_R), FILLET4_R, 90, 132.163983462)
            Line((FILLET4_R * 1.5134880677, -FILLET4_R * 1.67125478155), (0, 0))
            Line((0, 0), (FILLET4_R * 2.25471476598, 0))
        make_face()
    extrude(amount=10)
    with BuildSketch(Plane(origin=(0, 92.166654443, -200), x_dir=(0, -0.6804155236626022, 0.7328265246011136), z_dir=(1, 0, 0))) as fillet4_piece_7:
        with BuildLine():
            CenterArc((FILLET4_R * 0.436098402021, -FILLET4_R), FILLET4_R, 90, 47.123877933)
            Line((-FILLET4_R * 0.29672812258, -FILLET4_R * 0.319584476337), (0, 0))
            Line((0, 0), (FILLET4_R * 0.436098402021, 0))
        make_face()
    extrude(amount=10)
    with BuildSketch(Plane(origin=(193.2, 92.166654443, -200), x_dir=(0, 1, 0), z_dir=(1, 0, 0))) as fillet4_piece_8:
        with BuildLine():
            CenterArc((FILLET4_R * 0.436098402021, FILLET4_R), FILLET4_R, 222.876122067, 47.123877933)
            Line((-FILLET4_R * 0.29672812258, FILLET4_R * 0.319584476337), (0, 0))
            Line((0, 0), (FILLET4_R * 0.436098402021, 0))
        make_face()
    extrude(amount=10)


solid = part.part
